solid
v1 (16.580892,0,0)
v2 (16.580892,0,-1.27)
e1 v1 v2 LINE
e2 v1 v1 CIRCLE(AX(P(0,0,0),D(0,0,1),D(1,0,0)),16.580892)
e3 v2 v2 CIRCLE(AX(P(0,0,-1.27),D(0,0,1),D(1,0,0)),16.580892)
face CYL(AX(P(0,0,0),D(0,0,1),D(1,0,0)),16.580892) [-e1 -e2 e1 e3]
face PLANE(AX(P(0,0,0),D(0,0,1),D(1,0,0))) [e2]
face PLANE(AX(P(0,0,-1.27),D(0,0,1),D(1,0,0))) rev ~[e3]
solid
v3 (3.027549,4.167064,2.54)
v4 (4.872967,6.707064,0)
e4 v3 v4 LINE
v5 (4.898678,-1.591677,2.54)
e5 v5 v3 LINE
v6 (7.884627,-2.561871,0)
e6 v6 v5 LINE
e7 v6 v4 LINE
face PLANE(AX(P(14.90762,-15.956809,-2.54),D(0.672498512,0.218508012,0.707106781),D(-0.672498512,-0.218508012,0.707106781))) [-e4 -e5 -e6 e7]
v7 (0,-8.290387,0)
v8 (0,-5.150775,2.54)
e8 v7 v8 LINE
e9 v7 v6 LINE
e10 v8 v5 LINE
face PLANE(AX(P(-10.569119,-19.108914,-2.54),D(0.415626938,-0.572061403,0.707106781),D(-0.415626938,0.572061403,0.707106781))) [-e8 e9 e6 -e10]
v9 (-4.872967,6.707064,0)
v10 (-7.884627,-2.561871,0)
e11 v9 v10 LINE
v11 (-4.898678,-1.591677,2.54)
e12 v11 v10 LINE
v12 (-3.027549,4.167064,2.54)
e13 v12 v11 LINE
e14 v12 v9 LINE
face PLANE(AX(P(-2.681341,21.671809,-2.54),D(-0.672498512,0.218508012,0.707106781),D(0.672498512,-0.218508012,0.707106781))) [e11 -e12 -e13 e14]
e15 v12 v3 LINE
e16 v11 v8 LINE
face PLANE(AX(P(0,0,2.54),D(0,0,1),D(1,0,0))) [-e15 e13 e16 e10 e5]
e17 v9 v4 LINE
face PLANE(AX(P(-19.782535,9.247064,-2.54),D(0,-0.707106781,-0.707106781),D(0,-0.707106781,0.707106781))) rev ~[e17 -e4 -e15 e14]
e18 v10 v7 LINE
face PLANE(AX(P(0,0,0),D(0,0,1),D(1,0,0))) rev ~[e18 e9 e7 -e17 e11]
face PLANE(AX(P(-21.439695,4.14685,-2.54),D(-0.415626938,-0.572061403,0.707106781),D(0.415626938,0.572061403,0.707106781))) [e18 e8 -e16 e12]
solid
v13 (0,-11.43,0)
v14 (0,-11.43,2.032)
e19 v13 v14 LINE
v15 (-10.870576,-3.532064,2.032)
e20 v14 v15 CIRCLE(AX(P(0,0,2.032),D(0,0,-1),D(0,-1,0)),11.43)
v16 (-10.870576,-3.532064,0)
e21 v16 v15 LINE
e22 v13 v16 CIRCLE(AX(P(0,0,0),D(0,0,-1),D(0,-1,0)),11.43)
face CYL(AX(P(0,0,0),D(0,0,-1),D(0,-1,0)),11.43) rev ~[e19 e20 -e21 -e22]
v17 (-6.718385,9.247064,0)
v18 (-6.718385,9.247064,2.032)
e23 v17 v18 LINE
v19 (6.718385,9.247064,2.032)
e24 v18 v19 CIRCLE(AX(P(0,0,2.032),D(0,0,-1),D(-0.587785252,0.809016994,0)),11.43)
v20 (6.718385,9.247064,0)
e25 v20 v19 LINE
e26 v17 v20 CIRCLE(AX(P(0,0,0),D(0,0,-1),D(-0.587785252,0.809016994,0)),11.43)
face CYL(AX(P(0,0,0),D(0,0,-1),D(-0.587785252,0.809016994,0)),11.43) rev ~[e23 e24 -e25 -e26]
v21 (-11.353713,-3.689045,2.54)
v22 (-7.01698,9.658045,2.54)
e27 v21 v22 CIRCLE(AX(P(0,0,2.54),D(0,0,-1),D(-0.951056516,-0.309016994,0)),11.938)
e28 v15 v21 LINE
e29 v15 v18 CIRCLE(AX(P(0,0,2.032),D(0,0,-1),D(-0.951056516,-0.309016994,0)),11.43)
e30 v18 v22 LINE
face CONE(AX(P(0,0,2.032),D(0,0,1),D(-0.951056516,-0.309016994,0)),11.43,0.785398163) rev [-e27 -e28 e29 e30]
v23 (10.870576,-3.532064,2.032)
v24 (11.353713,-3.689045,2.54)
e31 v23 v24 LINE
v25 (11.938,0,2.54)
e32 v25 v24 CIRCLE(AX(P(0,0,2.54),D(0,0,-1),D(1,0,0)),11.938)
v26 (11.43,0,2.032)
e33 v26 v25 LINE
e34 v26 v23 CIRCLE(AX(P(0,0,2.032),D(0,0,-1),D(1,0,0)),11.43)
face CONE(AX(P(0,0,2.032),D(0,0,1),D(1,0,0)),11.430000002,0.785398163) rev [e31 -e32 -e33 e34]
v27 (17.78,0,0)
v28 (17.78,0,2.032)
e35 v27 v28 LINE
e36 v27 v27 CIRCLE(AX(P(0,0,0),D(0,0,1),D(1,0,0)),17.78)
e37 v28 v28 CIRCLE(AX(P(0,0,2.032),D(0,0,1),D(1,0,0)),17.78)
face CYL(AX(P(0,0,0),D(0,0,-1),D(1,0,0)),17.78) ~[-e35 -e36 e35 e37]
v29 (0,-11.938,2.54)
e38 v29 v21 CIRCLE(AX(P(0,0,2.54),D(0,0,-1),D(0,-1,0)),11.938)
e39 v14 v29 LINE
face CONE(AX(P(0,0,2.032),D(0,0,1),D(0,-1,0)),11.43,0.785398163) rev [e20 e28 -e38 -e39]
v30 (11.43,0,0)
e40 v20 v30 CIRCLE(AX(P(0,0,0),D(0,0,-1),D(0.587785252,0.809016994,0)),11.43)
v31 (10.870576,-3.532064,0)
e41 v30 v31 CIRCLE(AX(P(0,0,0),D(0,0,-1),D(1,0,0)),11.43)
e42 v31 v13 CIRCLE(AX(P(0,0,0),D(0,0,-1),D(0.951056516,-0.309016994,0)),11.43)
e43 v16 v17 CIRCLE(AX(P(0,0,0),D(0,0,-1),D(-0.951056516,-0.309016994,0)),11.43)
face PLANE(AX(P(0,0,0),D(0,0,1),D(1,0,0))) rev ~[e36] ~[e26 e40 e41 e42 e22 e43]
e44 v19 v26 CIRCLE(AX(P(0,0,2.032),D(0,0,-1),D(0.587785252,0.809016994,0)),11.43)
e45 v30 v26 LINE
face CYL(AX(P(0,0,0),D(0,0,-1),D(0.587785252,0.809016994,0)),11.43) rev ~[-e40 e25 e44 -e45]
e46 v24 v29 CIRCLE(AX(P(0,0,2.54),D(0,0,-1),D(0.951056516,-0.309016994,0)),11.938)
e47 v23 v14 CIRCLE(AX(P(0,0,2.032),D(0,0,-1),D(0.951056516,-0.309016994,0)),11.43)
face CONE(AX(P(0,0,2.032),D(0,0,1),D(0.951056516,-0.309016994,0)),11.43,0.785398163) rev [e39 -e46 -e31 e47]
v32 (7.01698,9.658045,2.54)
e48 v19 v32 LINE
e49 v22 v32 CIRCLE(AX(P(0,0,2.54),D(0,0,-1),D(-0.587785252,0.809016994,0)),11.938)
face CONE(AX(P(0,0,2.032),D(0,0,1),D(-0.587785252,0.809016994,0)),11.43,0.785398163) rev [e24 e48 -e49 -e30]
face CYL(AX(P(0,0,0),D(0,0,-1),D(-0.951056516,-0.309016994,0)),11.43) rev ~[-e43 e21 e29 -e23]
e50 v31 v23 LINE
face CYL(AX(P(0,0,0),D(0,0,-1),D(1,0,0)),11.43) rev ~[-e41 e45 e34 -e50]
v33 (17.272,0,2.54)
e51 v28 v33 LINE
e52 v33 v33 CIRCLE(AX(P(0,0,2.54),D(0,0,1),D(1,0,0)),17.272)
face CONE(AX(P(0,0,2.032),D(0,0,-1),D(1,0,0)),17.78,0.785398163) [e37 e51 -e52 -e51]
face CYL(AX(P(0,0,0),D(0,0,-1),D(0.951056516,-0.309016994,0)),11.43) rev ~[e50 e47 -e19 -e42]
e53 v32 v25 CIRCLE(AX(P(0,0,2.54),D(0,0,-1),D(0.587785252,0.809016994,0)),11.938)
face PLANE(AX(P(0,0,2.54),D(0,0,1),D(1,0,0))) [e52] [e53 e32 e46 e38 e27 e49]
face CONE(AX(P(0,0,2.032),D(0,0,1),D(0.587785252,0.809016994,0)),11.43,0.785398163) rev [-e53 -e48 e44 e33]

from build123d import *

# Parameters (mm, degrees)
F0_R        = 17.78
F1_DEPTH    = 2.54
F2_SIZE     = 0.508
F3_T1_DEPTH = 39.5650700251
F3_T3_DEPTH = 39.5650700251
F3_T5_DEPTH = 39.5650700251
F3_T7_DEPTH = 39.5650700251
F3_T9_DEPTH = 39.5650700251
F4_R        = 16.580892073
F5_DEPTH    = 1.27


# Not quite as in the source:
# - a fillet or chamfer that OpenCascade refuses, or shapes differently, is made with other operations: its cross-section is extruded or revolved along the edge and cut away or added


with BuildPart() as f1:
    # F0 (on Top) → F1 (new body)
    with BuildSketch(Plane.XY):
        Circle(F0_R)
        with BuildLine():
            ThreePointArc((6.7183854337, 9.2470642457), (10.1842045715, 5.189111412), (11.43, 0))
            ThreePointArc((11.43, 0), (11.289277733, -1.7880459354), (10.8705759813, -3.5320642457))
            ThreePointArc((10.8705759813, -3.5320642457), (6.7183854337, -9.2470642457), (0, -11.43))
            ThreePointArc((0, -11.43), (-6.7183854337, -9.2470642457), (-10.8705759813, -3.5320642457))
            ThreePointArc((-10.8705759813, -3.5320642457), (-10.8705759813, 3.5320642457), (-6.7183854337, 9.2470642457))
            ThreePointArc((-6.7183854337, 9.2470642457), (0, 11.43), (6.7183854337, 9.2470642457))
        make_face(mode=Mode.SUBTRACT)
    extrude(amount=F1_DEPTH)

    # F2
    f2_edges = [f1.edges().sort_by_distance(p)[0] for p in [
        (-17.78, 0, 2.54),
        (0, 11.43, 2.54),
    ]]
    chamfer(f2_edges, length=F2_SIZE)


with BuildPart() as f1b:
    # F0 (on Top) → F1, piece 2 (new body)
    with BuildSketch(Plane.XY):
        Polygon((10.8705759813, -3.5320642457), (6.7183854337, 9.2470642457), (-6.7183854337, 9.2470642457), (-10.8705759813, -3.5320642457), (0, -11.43), align=None)
    extrude(amount=F1_DEPTH)

    # F3: chamfer of 5.08 on 5 edges, made by hand

    # F3_s2 → F3_t1 (cut)
    with BuildSketch(Plane(origin=(-16.004407017, 11.6278823333, 0), x_dir=(0, 0, 1), z_dir=(0.8090169944, -0.5877852523, 0))):
        Polygon((-2.54, 9.2470642457), (2.54, 4.1670642457), (2.54, 9.2470642457), align=None)
    extrude(amount=F3_T1_DEPTH, mode=Mode.SUBTRACT)

    # F3_s4 → F3_t3 (cut)
    with BuildSketch(Plane(origin=(-16.004407017, -11.6278823333, 0), x_dir=(0, 0, 1), z_dir=(0.8090169944, 0.5877852523, 0))):
        Polygon((-2.54, 9.2470642457), (2.54, 4.1670642457), (2.54, 9.2470642457), align=None)
    extrude(amount=F3_T3_DEPTH, mode=Mode.SUBTRACT)

    # F3_s6 → F3_t5 (cut)
    with BuildSketch(Plane(origin=(6.1131395107, -18.8143088325, 0), x_dir=(0, 0, 1), z_dir=(-0.3090169944, 0.9510565163, 0))):
        Polygon((-2.54, 9.2470642457), (2.54, 4.1670642457), (2.54, 9.2470642457), align=None)
    extrude(amount=F3_T5_DEPTH, mode=Mode.SUBTRACT)

    # F3_s8 → F3_t7 (cut)
    with BuildSketch(Plane.YZ.offset(-19.7825350126)):
        Polygon((9.2470642457, -2.54), (4.1670642457, 2.54), (9.2470642457, 2.54), align=None)
    extrude(amount=F3_T7_DEPTH, mode=Mode.SUBTRACT)

    # F3_s10 → F3_t9 (cut)
    with BuildSketch(Plane(origin=(6.1131395107, 18.8143088325, 0), x_dir=(0, 0, 1), z_dir=(-0.3090169944, -0.9510565163, 0))):
        Polygon((-2.54, 9.2470642457), (2.54, 4.1670642457), (2.54, 9.2470642457), align=None)
    extrude(amount=F3_T9_DEPTH, mode=Mode.SUBTRACT)


with BuildPart() as f5:
    # F4 (on Top) → F5 (new body)
    with BuildSketch(Plane.XY):
        Circle(F4_R)
    extrude(amount=-F5_DEPTH)


solid = Compound([f1.part, f1b.part, f5.part])
